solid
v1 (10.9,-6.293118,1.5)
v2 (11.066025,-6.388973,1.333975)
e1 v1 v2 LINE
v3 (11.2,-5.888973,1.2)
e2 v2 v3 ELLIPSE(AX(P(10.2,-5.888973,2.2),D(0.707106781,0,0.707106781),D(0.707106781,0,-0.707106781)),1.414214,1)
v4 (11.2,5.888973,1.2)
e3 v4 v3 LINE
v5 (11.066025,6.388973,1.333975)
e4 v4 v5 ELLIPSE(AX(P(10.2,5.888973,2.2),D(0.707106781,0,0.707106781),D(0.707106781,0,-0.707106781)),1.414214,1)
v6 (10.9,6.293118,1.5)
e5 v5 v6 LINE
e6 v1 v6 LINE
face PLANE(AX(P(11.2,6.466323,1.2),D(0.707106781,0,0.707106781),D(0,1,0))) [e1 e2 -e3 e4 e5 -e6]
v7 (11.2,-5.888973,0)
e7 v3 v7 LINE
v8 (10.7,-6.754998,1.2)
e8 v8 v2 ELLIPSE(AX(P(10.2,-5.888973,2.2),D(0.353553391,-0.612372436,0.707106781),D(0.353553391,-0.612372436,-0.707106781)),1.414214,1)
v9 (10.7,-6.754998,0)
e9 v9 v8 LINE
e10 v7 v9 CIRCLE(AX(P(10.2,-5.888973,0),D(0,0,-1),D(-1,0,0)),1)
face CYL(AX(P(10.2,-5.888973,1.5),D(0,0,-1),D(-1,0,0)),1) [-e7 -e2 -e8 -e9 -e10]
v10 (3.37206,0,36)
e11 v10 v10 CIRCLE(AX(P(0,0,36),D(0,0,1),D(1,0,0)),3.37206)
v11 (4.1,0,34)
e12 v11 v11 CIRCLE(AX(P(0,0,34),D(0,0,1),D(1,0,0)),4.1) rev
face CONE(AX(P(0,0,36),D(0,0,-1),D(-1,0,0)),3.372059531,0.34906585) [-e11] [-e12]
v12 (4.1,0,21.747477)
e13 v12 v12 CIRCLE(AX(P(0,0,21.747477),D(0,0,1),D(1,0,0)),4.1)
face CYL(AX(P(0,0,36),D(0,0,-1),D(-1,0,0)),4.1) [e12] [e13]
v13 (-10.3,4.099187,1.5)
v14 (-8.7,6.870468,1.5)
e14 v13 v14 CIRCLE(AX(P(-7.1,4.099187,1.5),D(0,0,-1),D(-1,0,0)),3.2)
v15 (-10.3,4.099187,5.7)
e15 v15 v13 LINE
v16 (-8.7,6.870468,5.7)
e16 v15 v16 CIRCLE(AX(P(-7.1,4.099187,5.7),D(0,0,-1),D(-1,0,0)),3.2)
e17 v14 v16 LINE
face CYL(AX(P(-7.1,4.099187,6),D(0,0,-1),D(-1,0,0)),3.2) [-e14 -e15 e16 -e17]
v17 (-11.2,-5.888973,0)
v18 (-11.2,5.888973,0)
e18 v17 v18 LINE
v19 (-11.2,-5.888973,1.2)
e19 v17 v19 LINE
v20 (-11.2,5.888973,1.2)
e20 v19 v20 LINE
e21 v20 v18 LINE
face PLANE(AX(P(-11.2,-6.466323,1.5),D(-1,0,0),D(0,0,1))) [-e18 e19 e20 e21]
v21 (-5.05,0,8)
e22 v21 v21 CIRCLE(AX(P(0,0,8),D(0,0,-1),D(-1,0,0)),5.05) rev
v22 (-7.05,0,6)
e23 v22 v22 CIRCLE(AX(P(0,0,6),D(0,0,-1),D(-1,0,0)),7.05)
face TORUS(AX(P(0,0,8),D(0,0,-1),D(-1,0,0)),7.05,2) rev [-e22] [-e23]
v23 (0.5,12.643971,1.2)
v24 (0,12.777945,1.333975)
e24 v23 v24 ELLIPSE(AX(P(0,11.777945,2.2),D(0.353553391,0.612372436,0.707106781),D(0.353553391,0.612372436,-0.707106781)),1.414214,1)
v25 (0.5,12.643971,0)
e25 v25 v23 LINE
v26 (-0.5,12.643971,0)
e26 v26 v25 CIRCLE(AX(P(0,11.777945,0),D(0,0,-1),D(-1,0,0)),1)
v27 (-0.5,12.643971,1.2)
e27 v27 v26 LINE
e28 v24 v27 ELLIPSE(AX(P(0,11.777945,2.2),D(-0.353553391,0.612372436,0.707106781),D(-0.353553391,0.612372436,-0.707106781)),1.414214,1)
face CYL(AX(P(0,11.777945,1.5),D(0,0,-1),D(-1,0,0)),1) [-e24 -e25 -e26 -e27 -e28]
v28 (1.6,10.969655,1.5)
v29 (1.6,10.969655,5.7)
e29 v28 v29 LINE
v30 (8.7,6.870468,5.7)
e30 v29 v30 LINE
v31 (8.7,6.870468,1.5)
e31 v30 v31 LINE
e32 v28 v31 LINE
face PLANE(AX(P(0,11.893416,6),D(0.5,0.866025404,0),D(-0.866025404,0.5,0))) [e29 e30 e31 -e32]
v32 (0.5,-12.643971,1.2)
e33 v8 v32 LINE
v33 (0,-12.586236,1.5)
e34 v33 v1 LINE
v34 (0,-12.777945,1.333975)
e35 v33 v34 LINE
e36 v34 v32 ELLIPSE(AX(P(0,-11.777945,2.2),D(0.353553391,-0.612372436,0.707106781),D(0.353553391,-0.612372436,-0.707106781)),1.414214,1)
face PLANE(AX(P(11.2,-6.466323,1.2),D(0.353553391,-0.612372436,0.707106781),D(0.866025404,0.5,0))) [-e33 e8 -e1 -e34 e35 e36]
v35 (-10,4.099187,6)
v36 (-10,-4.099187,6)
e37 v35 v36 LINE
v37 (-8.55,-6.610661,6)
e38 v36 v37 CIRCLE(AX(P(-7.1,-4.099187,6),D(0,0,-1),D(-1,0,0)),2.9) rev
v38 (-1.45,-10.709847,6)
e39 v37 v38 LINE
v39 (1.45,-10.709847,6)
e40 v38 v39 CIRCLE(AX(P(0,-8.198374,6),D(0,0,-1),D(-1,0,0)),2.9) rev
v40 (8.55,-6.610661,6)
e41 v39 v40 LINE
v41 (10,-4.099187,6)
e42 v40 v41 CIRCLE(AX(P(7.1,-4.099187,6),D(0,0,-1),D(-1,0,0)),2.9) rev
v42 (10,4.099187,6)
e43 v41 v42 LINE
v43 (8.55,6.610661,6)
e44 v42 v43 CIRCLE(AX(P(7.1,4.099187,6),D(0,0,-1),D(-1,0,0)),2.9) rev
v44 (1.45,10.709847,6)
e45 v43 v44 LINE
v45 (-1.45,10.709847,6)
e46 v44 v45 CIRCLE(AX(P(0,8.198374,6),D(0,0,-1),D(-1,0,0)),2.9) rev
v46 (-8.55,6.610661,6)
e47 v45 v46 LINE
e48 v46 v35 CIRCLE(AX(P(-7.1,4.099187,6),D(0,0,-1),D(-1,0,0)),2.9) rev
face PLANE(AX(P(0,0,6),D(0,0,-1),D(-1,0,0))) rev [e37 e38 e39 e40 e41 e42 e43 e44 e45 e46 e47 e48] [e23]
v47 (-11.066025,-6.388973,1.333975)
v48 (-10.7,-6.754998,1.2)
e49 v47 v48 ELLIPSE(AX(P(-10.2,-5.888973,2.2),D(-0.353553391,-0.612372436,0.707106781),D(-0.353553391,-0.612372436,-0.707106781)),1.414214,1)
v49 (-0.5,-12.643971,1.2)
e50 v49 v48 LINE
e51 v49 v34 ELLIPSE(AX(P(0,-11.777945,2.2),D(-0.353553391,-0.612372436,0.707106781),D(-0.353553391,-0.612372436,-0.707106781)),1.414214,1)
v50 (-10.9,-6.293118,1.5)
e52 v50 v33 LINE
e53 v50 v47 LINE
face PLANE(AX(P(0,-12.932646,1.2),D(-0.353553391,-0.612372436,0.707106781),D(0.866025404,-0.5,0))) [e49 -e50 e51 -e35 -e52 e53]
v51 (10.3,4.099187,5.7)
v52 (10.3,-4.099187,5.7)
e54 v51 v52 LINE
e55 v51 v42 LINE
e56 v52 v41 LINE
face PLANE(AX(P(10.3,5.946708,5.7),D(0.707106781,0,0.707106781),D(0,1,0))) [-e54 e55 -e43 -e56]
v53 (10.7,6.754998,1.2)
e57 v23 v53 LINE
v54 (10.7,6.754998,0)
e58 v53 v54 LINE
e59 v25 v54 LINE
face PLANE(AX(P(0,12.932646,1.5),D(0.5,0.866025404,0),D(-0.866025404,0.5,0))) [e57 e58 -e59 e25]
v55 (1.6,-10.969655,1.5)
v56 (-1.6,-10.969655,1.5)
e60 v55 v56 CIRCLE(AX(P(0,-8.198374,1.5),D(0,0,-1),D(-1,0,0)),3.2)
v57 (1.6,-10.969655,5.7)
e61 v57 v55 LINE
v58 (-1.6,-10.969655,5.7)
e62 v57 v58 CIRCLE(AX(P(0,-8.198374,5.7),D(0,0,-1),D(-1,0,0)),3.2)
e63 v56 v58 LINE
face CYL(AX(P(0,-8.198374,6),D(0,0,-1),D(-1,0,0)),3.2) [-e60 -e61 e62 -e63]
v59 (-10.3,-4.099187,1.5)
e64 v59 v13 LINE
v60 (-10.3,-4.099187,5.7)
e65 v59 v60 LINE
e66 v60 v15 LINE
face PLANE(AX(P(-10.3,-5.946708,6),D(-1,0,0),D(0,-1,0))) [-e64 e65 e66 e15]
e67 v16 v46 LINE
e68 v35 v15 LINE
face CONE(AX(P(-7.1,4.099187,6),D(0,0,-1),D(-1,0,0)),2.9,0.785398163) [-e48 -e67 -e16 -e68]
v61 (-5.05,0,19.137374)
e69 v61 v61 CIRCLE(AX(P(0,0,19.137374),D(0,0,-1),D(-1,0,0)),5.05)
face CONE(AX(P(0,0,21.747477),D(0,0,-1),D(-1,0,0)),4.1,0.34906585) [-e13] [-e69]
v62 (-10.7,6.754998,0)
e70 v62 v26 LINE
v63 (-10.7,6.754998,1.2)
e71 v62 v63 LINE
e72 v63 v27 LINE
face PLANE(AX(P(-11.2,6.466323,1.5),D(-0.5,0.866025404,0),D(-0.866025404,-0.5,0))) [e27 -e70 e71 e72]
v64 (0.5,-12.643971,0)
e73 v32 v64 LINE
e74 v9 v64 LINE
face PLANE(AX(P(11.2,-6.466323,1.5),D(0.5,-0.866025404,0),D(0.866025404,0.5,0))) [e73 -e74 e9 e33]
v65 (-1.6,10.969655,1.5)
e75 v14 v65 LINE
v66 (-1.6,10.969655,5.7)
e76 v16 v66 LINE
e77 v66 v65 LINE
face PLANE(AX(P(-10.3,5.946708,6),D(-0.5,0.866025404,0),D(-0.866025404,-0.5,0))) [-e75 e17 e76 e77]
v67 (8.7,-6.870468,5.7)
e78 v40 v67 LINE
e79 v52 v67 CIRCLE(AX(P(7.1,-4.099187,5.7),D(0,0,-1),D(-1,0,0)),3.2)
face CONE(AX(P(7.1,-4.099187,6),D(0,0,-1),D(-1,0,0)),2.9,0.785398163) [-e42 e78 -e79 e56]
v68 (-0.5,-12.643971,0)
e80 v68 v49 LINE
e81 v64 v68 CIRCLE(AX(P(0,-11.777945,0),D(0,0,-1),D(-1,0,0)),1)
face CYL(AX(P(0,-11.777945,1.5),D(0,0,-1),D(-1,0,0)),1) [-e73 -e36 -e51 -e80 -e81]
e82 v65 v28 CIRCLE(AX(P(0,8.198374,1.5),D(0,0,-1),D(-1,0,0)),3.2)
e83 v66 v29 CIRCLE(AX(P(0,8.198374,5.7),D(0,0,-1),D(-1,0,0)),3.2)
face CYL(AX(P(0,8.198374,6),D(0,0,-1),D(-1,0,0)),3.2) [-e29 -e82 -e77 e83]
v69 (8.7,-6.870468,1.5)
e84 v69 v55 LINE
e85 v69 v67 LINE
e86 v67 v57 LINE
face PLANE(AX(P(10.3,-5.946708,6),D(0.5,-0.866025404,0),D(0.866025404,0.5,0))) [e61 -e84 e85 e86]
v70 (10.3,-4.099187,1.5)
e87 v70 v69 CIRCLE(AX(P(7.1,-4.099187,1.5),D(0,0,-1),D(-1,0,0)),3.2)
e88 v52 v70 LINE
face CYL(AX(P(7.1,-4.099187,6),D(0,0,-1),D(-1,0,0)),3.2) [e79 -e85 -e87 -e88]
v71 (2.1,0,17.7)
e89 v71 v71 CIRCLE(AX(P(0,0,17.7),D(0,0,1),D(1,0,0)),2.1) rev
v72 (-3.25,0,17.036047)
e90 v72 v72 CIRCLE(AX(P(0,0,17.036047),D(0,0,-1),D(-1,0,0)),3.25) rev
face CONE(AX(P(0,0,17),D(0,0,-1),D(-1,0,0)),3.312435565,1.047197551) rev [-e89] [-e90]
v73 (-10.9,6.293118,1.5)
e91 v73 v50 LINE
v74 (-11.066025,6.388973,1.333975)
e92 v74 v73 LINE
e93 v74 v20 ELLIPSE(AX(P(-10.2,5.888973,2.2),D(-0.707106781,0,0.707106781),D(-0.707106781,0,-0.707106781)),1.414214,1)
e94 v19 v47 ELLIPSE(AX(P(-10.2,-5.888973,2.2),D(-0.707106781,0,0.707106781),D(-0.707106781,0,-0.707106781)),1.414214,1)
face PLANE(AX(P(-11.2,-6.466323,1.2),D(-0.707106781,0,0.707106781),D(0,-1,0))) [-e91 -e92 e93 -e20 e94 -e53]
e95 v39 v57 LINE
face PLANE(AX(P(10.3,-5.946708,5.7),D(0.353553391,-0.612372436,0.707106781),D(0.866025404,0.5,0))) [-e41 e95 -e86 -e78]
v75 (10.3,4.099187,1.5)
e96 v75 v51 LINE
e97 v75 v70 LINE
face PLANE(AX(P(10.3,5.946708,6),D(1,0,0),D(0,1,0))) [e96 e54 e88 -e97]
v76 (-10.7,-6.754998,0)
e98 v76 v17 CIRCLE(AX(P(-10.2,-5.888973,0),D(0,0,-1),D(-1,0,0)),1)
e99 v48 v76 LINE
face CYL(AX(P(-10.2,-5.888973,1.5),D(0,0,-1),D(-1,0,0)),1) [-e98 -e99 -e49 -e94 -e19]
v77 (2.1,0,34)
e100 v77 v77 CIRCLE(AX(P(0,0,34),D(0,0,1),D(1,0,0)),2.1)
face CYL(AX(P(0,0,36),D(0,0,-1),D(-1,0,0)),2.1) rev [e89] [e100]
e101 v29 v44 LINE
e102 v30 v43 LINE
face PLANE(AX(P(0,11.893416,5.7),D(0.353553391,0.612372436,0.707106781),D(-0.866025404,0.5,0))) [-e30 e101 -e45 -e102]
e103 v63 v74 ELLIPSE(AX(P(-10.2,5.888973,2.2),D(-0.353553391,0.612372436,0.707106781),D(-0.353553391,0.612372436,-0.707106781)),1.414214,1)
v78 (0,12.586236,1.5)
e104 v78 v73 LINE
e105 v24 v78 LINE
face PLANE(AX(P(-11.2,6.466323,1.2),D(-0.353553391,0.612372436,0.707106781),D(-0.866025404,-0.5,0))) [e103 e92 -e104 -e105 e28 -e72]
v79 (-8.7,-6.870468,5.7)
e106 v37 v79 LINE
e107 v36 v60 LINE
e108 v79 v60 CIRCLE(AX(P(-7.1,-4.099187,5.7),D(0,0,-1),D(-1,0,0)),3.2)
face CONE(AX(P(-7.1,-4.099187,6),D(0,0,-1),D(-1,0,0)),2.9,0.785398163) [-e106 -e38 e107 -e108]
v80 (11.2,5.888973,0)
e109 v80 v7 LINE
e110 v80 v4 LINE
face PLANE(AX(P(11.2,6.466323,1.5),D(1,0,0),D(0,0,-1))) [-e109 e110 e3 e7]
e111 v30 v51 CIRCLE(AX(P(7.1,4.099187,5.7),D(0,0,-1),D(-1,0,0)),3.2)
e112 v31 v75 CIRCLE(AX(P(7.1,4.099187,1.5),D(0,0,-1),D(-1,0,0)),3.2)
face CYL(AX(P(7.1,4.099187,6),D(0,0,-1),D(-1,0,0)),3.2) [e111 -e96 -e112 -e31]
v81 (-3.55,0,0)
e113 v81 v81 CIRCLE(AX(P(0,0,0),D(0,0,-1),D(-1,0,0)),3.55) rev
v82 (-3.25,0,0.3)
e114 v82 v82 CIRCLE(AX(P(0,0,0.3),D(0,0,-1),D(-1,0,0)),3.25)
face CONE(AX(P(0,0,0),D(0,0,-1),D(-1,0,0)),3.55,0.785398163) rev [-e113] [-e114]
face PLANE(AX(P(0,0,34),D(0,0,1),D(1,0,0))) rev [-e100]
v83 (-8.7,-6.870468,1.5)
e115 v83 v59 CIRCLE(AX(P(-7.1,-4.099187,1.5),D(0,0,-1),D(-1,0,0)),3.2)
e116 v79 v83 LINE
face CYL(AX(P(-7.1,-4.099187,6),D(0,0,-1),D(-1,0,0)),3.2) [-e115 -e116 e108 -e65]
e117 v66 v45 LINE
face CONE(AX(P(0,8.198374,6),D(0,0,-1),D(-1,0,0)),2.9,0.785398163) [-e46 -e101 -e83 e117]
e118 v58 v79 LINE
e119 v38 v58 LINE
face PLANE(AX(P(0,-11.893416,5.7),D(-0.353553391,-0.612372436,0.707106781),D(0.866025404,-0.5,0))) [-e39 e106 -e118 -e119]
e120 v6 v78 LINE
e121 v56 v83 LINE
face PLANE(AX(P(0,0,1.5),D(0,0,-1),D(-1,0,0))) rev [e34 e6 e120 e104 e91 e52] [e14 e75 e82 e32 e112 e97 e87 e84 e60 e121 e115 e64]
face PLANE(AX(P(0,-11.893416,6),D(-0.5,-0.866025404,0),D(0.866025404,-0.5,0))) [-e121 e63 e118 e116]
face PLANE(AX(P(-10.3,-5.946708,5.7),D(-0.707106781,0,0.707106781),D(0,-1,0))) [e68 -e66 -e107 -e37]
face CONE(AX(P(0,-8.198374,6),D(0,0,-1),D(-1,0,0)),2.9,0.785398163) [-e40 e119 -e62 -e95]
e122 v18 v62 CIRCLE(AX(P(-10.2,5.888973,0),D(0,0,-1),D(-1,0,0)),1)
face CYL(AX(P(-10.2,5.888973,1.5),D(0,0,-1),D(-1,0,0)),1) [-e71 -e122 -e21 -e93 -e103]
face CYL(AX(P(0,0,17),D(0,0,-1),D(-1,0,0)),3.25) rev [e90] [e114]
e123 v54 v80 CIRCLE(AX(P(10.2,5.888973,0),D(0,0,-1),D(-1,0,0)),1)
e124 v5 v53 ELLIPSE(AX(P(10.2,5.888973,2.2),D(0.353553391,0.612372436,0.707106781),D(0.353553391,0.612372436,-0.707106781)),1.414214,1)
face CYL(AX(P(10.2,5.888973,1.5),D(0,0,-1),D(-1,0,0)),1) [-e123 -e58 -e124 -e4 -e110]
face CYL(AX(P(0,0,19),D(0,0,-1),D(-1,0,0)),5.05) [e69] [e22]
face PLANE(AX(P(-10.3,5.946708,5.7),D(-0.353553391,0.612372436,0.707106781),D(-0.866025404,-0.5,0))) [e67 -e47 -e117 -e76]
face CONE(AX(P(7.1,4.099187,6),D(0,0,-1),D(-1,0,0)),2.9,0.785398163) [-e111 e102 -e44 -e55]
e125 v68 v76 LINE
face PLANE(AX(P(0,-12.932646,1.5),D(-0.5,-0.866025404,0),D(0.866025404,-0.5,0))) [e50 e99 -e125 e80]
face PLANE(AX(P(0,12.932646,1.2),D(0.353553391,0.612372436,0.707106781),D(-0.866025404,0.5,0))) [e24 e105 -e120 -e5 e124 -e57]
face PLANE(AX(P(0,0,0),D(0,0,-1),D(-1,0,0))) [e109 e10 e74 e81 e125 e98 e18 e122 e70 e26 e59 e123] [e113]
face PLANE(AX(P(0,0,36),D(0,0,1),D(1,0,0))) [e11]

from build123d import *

# Parameters (mm, degrees)
BOSS_EXTRUDE1_DEPTH  = 1.5
SKETCH1_8_R          = 4.1
BOSS_EXTRUDE3_DEPTH  = 36
SKETCH1_9_R          = 5.05
BOSS_EXTRUDE4_DEPTH  = 19
SHELL1_START         = 2
SHELL1_OUTLINE_R     = 2.1
SHELL1_DEPTH         = 32
SHELL1_2_OUTLINE_R   = 3.05
SHELL1_2_OUTLINE_R_2 = 2.1
SHELL1_2_DEPTH       = 15
SKETCH1_10_R         = 3.25
CUT_EXTRUDE1_DEPTH   = 17
SKETCH1_3_R          = 3.25
BOSS_EXTRUDE2_DEPTH  = 6
CHAMFER1_SIZE        = 2
CHAMFER1_SIZE2       = 0.727940469
CHAMFER2_SIZE        = 2.747477419
CHAMFER2_SIZE_2      = 1
CHAMFER3_SIZE        = 1.212435565
CHAMFER3_SIZE_2      = 0.7
CHAMFER6_SIZE        = 0.3
FILLET1_R            = 3.2
CHAMFER5_SIZE        = 0.3
FILLET2_R            = 1
FILLET3_R            = 2


# Read off the part's stored shape, not the designer's step: Shell1
with BuildPart() as part:
    # Sketch1 → Boss-Extrude1 (new body)
    with BuildSketch(Plane.XY):
        Polygon((-11.2, 6.466323015), (0, 12.93264603), (11.2, 6.466323015), (11.2, -6.466323015), (0, -12.93264603), (-11.2, -6.466323015), align=None)
    extrude(amount=BOSS_EXTRUDE1_DEPTH)

    # Sketch1<8> → Boss-Extrude3 (add)
    with BuildSketch(Plane.XY):
        with Locations(Location((0, 0, 0), (0, 0, 180))):
            Circle(SKETCH1_8_R)
    extrude(amount=BOSS_EXTRUDE3_DEPTH)

    # Sketch1<9> → Boss-Extrude4 (add)
    with BuildSketch(Plane.XY):
        with Locations(Location((0, 0, 0), (0, 0, 180))):
            Circle(SKETCH1_9_R)
    extrude(amount=BOSS_EXTRUDE4_DEPTH)

    # Shell1 outline → Shell1 (cut)
    with BuildSketch(Plane.XY.offset(SHELL1_START)):
        Circle(SHELL1_OUTLINE_R)
    extrude(amount=SHELL1_DEPTH, mode=Mode.SUBTRACT)

    # Shell1 2 outline → Shell1 2 (cut)
    with BuildSketch(Plane.XY.offset(SHELL1_START)):
        Circle(SHELL1_2_OUTLINE_R)
        Circle(SHELL1_2_OUTLINE_R_2, mode=Mode.SUBTRACT)
    extrude(amount=SHELL1_2_DEPTH, mode=Mode.SUBTRACT)

    # Sketch1<10> → Cut-Extrude1 (cut)
    with BuildSketch(Plane.XY):
        Circle(SKETCH1_10_R)
    extrude(amount=CUT_EXTRUDE1_DEPTH, mode=Mode.SUBTRACT)

    # Sketch1<3> → Boss-Extrude2 (add)
    with BuildSketch(Plane.XY):
        Polygon((0, 11.893415545), (10.3, 5.946707773), (10.3, -5.946707773), (0, -11.893415545), (-10.3, -5.946707773), (-10.3, 5.946707773), align=None)
        Circle(SKETCH1_3_R, mode=Mode.SUBTRACT)
    extrude(amount=BOSS_EXTRUDE2_DEPTH)

    # Chamfer1
    chamfer1_edges = [part.edges().sort_by_distance(p)[0] for p in [
        (4.1, 0, 36),
    ]]
    chamfer1_side = [part.faces().sort_by_distance(p)[0] for p in [
        (4.1, 0, 27.5),
    ]]
    chamfer(chamfer1_edges, length=CHAMFER1_SIZE, length2=CHAMFER1_SIZE2, reference=chamfer1_side[0])

    # Chamfer2
    # the kernel refuses this chamfer: 2.747477419, 1 mm, written as the material it adds along each edge
    with BuildSketch(Plane(origin=(0, 0, 19), x_dir=(-1, 0, 0), z_dir=(0, -1, 0))) as chamfer2_piece_1_section:
        Polygon((4.1, -CHAMFER2_SIZE), (4.1 + CHAMFER2_SIZE_2, 0), (4.1, 0), align=None)
    chamfer2_piece_1 = revolve(axis=Axis((0, 0, 19), (0, 0, -1)), mode=Mode.PRIVATE)
    chamfer2_piece_1 = chamfer2_piece_1 & Plane(origin=(0, 0, 20.481947897), x_dir=(-1, 0, 0), z_dir=(0, 0, -1)) * Cylinder(5.05, 21, mode=Mode.PRIVATE)
    add(chamfer2_piece_1)

    # Chamfer3
    # the kernel refuses this chamfer: 1.212435565, 0.7 mm, written as the material it takes off along each edge
    with BuildSketch(Plane(origin=(0, 0, 17), x_dir=(1, 0, 0), z_dir=(0, -1, 0))) as chamfer3_piece_1_section:
        Polygon((2.1 + CHAMFER3_SIZE, 0), (2.1, CHAMFER3_SIZE_2), (2.1, 0), align=None)
    chamfer3_piece_1 = revolve(axis=Axis((0, 0, 17), (0, 0, 1)), mode=Mode.PRIVATE)
    chamfer3_piece_1 = chamfer3_piece_1 & Plane(origin=(0, 0, 17.363214185), x_dir=(1, 0, 0), z_dir=(0, 0, -1)) * Cylinder(3.25, 14, mode=Mode.PRIVATE)
    add(chamfer3_piece_1, mode=Mode.SUBTRACT)

    # Chamfer6
    chamfer6_edges = [part.edges().sort_by_distance(p)[0] for p in [
        (-3.25, 0, 0),
    ]]
    chamfer(chamfer6_edges, length=CHAMFER6_SIZE)

    # Fillet1
    fillet1_edges = [part.edges().sort_by_distance(p)[0] for p in [
        (-10.3, -5.946707773, 3.75),
        (0, -11.893415545, 3.75),
        (10.3, -5.946707773, 3.75),
        (10.3, 5.946707773, 3.75),
        (0, 11.893415545, 3.75),
        (-10.3, 5.946707773, 3.75),
    ]]
    fillet(fillet1_edges, radius=FILLET1_R)

    # Chamfer5
    chamfer5_edges = [part.edges().sort_by_distance(p)[0] for p in [
        (-5.15, -8.920061659, 6),
        (5.15, 8.920061659, 6),
        (-5.15, 8.920061659, 6),
        (-10.3, 0, 6),
        (9.871281292, 5.699186911, 6),
        (0, 11.398373822, 6),
        (-9.871281292, 5.699186911, 6),
        (-9.871281292, -5.699186911, 6),
        (0, -11.398373822, 6),
        (9.871281292, -5.699186911, 6),
        (5.6, 9.699484522, 1.5),
        (11.2, 0, 1.5),
        (5.6, -9.699484522, 1.5),
        (-5.6, -9.699484522, 1.5),
        (-11.2, 0, 1.5),
        (-5.6, 9.699484522, 1.5),
        (10.3, 0, 6),
        (5.15, -8.920061659, 6),
    ]]
    chamfer(chamfer5_edges, length=CHAMFER5_SIZE)

    # Fillet2
    fillet2_edges = [part.edges().sort_by_distance(p)[0] for p in [
        (11.2, 6.466323015, 0.6),
        (11.2, -6.466323015, 0.6),
        (0, -12.93264603, 0.6),
        (-11.2, -6.466323015, 0.6),
        (-11.2, 6.466323015, 0.6),
        (0, 12.93264603, 0.6),
    ]]
    fillet(fillet2_edges, radius=FILLET2_R)

    # Fillet3
    fillet3_edges = [part.edges().sort_by_distance(p)[0] for p in [
        (5.05, 0, 6),
    ]]
    fillet(fillet3_edges, radius=FILLET3_R)


solid = part.part
